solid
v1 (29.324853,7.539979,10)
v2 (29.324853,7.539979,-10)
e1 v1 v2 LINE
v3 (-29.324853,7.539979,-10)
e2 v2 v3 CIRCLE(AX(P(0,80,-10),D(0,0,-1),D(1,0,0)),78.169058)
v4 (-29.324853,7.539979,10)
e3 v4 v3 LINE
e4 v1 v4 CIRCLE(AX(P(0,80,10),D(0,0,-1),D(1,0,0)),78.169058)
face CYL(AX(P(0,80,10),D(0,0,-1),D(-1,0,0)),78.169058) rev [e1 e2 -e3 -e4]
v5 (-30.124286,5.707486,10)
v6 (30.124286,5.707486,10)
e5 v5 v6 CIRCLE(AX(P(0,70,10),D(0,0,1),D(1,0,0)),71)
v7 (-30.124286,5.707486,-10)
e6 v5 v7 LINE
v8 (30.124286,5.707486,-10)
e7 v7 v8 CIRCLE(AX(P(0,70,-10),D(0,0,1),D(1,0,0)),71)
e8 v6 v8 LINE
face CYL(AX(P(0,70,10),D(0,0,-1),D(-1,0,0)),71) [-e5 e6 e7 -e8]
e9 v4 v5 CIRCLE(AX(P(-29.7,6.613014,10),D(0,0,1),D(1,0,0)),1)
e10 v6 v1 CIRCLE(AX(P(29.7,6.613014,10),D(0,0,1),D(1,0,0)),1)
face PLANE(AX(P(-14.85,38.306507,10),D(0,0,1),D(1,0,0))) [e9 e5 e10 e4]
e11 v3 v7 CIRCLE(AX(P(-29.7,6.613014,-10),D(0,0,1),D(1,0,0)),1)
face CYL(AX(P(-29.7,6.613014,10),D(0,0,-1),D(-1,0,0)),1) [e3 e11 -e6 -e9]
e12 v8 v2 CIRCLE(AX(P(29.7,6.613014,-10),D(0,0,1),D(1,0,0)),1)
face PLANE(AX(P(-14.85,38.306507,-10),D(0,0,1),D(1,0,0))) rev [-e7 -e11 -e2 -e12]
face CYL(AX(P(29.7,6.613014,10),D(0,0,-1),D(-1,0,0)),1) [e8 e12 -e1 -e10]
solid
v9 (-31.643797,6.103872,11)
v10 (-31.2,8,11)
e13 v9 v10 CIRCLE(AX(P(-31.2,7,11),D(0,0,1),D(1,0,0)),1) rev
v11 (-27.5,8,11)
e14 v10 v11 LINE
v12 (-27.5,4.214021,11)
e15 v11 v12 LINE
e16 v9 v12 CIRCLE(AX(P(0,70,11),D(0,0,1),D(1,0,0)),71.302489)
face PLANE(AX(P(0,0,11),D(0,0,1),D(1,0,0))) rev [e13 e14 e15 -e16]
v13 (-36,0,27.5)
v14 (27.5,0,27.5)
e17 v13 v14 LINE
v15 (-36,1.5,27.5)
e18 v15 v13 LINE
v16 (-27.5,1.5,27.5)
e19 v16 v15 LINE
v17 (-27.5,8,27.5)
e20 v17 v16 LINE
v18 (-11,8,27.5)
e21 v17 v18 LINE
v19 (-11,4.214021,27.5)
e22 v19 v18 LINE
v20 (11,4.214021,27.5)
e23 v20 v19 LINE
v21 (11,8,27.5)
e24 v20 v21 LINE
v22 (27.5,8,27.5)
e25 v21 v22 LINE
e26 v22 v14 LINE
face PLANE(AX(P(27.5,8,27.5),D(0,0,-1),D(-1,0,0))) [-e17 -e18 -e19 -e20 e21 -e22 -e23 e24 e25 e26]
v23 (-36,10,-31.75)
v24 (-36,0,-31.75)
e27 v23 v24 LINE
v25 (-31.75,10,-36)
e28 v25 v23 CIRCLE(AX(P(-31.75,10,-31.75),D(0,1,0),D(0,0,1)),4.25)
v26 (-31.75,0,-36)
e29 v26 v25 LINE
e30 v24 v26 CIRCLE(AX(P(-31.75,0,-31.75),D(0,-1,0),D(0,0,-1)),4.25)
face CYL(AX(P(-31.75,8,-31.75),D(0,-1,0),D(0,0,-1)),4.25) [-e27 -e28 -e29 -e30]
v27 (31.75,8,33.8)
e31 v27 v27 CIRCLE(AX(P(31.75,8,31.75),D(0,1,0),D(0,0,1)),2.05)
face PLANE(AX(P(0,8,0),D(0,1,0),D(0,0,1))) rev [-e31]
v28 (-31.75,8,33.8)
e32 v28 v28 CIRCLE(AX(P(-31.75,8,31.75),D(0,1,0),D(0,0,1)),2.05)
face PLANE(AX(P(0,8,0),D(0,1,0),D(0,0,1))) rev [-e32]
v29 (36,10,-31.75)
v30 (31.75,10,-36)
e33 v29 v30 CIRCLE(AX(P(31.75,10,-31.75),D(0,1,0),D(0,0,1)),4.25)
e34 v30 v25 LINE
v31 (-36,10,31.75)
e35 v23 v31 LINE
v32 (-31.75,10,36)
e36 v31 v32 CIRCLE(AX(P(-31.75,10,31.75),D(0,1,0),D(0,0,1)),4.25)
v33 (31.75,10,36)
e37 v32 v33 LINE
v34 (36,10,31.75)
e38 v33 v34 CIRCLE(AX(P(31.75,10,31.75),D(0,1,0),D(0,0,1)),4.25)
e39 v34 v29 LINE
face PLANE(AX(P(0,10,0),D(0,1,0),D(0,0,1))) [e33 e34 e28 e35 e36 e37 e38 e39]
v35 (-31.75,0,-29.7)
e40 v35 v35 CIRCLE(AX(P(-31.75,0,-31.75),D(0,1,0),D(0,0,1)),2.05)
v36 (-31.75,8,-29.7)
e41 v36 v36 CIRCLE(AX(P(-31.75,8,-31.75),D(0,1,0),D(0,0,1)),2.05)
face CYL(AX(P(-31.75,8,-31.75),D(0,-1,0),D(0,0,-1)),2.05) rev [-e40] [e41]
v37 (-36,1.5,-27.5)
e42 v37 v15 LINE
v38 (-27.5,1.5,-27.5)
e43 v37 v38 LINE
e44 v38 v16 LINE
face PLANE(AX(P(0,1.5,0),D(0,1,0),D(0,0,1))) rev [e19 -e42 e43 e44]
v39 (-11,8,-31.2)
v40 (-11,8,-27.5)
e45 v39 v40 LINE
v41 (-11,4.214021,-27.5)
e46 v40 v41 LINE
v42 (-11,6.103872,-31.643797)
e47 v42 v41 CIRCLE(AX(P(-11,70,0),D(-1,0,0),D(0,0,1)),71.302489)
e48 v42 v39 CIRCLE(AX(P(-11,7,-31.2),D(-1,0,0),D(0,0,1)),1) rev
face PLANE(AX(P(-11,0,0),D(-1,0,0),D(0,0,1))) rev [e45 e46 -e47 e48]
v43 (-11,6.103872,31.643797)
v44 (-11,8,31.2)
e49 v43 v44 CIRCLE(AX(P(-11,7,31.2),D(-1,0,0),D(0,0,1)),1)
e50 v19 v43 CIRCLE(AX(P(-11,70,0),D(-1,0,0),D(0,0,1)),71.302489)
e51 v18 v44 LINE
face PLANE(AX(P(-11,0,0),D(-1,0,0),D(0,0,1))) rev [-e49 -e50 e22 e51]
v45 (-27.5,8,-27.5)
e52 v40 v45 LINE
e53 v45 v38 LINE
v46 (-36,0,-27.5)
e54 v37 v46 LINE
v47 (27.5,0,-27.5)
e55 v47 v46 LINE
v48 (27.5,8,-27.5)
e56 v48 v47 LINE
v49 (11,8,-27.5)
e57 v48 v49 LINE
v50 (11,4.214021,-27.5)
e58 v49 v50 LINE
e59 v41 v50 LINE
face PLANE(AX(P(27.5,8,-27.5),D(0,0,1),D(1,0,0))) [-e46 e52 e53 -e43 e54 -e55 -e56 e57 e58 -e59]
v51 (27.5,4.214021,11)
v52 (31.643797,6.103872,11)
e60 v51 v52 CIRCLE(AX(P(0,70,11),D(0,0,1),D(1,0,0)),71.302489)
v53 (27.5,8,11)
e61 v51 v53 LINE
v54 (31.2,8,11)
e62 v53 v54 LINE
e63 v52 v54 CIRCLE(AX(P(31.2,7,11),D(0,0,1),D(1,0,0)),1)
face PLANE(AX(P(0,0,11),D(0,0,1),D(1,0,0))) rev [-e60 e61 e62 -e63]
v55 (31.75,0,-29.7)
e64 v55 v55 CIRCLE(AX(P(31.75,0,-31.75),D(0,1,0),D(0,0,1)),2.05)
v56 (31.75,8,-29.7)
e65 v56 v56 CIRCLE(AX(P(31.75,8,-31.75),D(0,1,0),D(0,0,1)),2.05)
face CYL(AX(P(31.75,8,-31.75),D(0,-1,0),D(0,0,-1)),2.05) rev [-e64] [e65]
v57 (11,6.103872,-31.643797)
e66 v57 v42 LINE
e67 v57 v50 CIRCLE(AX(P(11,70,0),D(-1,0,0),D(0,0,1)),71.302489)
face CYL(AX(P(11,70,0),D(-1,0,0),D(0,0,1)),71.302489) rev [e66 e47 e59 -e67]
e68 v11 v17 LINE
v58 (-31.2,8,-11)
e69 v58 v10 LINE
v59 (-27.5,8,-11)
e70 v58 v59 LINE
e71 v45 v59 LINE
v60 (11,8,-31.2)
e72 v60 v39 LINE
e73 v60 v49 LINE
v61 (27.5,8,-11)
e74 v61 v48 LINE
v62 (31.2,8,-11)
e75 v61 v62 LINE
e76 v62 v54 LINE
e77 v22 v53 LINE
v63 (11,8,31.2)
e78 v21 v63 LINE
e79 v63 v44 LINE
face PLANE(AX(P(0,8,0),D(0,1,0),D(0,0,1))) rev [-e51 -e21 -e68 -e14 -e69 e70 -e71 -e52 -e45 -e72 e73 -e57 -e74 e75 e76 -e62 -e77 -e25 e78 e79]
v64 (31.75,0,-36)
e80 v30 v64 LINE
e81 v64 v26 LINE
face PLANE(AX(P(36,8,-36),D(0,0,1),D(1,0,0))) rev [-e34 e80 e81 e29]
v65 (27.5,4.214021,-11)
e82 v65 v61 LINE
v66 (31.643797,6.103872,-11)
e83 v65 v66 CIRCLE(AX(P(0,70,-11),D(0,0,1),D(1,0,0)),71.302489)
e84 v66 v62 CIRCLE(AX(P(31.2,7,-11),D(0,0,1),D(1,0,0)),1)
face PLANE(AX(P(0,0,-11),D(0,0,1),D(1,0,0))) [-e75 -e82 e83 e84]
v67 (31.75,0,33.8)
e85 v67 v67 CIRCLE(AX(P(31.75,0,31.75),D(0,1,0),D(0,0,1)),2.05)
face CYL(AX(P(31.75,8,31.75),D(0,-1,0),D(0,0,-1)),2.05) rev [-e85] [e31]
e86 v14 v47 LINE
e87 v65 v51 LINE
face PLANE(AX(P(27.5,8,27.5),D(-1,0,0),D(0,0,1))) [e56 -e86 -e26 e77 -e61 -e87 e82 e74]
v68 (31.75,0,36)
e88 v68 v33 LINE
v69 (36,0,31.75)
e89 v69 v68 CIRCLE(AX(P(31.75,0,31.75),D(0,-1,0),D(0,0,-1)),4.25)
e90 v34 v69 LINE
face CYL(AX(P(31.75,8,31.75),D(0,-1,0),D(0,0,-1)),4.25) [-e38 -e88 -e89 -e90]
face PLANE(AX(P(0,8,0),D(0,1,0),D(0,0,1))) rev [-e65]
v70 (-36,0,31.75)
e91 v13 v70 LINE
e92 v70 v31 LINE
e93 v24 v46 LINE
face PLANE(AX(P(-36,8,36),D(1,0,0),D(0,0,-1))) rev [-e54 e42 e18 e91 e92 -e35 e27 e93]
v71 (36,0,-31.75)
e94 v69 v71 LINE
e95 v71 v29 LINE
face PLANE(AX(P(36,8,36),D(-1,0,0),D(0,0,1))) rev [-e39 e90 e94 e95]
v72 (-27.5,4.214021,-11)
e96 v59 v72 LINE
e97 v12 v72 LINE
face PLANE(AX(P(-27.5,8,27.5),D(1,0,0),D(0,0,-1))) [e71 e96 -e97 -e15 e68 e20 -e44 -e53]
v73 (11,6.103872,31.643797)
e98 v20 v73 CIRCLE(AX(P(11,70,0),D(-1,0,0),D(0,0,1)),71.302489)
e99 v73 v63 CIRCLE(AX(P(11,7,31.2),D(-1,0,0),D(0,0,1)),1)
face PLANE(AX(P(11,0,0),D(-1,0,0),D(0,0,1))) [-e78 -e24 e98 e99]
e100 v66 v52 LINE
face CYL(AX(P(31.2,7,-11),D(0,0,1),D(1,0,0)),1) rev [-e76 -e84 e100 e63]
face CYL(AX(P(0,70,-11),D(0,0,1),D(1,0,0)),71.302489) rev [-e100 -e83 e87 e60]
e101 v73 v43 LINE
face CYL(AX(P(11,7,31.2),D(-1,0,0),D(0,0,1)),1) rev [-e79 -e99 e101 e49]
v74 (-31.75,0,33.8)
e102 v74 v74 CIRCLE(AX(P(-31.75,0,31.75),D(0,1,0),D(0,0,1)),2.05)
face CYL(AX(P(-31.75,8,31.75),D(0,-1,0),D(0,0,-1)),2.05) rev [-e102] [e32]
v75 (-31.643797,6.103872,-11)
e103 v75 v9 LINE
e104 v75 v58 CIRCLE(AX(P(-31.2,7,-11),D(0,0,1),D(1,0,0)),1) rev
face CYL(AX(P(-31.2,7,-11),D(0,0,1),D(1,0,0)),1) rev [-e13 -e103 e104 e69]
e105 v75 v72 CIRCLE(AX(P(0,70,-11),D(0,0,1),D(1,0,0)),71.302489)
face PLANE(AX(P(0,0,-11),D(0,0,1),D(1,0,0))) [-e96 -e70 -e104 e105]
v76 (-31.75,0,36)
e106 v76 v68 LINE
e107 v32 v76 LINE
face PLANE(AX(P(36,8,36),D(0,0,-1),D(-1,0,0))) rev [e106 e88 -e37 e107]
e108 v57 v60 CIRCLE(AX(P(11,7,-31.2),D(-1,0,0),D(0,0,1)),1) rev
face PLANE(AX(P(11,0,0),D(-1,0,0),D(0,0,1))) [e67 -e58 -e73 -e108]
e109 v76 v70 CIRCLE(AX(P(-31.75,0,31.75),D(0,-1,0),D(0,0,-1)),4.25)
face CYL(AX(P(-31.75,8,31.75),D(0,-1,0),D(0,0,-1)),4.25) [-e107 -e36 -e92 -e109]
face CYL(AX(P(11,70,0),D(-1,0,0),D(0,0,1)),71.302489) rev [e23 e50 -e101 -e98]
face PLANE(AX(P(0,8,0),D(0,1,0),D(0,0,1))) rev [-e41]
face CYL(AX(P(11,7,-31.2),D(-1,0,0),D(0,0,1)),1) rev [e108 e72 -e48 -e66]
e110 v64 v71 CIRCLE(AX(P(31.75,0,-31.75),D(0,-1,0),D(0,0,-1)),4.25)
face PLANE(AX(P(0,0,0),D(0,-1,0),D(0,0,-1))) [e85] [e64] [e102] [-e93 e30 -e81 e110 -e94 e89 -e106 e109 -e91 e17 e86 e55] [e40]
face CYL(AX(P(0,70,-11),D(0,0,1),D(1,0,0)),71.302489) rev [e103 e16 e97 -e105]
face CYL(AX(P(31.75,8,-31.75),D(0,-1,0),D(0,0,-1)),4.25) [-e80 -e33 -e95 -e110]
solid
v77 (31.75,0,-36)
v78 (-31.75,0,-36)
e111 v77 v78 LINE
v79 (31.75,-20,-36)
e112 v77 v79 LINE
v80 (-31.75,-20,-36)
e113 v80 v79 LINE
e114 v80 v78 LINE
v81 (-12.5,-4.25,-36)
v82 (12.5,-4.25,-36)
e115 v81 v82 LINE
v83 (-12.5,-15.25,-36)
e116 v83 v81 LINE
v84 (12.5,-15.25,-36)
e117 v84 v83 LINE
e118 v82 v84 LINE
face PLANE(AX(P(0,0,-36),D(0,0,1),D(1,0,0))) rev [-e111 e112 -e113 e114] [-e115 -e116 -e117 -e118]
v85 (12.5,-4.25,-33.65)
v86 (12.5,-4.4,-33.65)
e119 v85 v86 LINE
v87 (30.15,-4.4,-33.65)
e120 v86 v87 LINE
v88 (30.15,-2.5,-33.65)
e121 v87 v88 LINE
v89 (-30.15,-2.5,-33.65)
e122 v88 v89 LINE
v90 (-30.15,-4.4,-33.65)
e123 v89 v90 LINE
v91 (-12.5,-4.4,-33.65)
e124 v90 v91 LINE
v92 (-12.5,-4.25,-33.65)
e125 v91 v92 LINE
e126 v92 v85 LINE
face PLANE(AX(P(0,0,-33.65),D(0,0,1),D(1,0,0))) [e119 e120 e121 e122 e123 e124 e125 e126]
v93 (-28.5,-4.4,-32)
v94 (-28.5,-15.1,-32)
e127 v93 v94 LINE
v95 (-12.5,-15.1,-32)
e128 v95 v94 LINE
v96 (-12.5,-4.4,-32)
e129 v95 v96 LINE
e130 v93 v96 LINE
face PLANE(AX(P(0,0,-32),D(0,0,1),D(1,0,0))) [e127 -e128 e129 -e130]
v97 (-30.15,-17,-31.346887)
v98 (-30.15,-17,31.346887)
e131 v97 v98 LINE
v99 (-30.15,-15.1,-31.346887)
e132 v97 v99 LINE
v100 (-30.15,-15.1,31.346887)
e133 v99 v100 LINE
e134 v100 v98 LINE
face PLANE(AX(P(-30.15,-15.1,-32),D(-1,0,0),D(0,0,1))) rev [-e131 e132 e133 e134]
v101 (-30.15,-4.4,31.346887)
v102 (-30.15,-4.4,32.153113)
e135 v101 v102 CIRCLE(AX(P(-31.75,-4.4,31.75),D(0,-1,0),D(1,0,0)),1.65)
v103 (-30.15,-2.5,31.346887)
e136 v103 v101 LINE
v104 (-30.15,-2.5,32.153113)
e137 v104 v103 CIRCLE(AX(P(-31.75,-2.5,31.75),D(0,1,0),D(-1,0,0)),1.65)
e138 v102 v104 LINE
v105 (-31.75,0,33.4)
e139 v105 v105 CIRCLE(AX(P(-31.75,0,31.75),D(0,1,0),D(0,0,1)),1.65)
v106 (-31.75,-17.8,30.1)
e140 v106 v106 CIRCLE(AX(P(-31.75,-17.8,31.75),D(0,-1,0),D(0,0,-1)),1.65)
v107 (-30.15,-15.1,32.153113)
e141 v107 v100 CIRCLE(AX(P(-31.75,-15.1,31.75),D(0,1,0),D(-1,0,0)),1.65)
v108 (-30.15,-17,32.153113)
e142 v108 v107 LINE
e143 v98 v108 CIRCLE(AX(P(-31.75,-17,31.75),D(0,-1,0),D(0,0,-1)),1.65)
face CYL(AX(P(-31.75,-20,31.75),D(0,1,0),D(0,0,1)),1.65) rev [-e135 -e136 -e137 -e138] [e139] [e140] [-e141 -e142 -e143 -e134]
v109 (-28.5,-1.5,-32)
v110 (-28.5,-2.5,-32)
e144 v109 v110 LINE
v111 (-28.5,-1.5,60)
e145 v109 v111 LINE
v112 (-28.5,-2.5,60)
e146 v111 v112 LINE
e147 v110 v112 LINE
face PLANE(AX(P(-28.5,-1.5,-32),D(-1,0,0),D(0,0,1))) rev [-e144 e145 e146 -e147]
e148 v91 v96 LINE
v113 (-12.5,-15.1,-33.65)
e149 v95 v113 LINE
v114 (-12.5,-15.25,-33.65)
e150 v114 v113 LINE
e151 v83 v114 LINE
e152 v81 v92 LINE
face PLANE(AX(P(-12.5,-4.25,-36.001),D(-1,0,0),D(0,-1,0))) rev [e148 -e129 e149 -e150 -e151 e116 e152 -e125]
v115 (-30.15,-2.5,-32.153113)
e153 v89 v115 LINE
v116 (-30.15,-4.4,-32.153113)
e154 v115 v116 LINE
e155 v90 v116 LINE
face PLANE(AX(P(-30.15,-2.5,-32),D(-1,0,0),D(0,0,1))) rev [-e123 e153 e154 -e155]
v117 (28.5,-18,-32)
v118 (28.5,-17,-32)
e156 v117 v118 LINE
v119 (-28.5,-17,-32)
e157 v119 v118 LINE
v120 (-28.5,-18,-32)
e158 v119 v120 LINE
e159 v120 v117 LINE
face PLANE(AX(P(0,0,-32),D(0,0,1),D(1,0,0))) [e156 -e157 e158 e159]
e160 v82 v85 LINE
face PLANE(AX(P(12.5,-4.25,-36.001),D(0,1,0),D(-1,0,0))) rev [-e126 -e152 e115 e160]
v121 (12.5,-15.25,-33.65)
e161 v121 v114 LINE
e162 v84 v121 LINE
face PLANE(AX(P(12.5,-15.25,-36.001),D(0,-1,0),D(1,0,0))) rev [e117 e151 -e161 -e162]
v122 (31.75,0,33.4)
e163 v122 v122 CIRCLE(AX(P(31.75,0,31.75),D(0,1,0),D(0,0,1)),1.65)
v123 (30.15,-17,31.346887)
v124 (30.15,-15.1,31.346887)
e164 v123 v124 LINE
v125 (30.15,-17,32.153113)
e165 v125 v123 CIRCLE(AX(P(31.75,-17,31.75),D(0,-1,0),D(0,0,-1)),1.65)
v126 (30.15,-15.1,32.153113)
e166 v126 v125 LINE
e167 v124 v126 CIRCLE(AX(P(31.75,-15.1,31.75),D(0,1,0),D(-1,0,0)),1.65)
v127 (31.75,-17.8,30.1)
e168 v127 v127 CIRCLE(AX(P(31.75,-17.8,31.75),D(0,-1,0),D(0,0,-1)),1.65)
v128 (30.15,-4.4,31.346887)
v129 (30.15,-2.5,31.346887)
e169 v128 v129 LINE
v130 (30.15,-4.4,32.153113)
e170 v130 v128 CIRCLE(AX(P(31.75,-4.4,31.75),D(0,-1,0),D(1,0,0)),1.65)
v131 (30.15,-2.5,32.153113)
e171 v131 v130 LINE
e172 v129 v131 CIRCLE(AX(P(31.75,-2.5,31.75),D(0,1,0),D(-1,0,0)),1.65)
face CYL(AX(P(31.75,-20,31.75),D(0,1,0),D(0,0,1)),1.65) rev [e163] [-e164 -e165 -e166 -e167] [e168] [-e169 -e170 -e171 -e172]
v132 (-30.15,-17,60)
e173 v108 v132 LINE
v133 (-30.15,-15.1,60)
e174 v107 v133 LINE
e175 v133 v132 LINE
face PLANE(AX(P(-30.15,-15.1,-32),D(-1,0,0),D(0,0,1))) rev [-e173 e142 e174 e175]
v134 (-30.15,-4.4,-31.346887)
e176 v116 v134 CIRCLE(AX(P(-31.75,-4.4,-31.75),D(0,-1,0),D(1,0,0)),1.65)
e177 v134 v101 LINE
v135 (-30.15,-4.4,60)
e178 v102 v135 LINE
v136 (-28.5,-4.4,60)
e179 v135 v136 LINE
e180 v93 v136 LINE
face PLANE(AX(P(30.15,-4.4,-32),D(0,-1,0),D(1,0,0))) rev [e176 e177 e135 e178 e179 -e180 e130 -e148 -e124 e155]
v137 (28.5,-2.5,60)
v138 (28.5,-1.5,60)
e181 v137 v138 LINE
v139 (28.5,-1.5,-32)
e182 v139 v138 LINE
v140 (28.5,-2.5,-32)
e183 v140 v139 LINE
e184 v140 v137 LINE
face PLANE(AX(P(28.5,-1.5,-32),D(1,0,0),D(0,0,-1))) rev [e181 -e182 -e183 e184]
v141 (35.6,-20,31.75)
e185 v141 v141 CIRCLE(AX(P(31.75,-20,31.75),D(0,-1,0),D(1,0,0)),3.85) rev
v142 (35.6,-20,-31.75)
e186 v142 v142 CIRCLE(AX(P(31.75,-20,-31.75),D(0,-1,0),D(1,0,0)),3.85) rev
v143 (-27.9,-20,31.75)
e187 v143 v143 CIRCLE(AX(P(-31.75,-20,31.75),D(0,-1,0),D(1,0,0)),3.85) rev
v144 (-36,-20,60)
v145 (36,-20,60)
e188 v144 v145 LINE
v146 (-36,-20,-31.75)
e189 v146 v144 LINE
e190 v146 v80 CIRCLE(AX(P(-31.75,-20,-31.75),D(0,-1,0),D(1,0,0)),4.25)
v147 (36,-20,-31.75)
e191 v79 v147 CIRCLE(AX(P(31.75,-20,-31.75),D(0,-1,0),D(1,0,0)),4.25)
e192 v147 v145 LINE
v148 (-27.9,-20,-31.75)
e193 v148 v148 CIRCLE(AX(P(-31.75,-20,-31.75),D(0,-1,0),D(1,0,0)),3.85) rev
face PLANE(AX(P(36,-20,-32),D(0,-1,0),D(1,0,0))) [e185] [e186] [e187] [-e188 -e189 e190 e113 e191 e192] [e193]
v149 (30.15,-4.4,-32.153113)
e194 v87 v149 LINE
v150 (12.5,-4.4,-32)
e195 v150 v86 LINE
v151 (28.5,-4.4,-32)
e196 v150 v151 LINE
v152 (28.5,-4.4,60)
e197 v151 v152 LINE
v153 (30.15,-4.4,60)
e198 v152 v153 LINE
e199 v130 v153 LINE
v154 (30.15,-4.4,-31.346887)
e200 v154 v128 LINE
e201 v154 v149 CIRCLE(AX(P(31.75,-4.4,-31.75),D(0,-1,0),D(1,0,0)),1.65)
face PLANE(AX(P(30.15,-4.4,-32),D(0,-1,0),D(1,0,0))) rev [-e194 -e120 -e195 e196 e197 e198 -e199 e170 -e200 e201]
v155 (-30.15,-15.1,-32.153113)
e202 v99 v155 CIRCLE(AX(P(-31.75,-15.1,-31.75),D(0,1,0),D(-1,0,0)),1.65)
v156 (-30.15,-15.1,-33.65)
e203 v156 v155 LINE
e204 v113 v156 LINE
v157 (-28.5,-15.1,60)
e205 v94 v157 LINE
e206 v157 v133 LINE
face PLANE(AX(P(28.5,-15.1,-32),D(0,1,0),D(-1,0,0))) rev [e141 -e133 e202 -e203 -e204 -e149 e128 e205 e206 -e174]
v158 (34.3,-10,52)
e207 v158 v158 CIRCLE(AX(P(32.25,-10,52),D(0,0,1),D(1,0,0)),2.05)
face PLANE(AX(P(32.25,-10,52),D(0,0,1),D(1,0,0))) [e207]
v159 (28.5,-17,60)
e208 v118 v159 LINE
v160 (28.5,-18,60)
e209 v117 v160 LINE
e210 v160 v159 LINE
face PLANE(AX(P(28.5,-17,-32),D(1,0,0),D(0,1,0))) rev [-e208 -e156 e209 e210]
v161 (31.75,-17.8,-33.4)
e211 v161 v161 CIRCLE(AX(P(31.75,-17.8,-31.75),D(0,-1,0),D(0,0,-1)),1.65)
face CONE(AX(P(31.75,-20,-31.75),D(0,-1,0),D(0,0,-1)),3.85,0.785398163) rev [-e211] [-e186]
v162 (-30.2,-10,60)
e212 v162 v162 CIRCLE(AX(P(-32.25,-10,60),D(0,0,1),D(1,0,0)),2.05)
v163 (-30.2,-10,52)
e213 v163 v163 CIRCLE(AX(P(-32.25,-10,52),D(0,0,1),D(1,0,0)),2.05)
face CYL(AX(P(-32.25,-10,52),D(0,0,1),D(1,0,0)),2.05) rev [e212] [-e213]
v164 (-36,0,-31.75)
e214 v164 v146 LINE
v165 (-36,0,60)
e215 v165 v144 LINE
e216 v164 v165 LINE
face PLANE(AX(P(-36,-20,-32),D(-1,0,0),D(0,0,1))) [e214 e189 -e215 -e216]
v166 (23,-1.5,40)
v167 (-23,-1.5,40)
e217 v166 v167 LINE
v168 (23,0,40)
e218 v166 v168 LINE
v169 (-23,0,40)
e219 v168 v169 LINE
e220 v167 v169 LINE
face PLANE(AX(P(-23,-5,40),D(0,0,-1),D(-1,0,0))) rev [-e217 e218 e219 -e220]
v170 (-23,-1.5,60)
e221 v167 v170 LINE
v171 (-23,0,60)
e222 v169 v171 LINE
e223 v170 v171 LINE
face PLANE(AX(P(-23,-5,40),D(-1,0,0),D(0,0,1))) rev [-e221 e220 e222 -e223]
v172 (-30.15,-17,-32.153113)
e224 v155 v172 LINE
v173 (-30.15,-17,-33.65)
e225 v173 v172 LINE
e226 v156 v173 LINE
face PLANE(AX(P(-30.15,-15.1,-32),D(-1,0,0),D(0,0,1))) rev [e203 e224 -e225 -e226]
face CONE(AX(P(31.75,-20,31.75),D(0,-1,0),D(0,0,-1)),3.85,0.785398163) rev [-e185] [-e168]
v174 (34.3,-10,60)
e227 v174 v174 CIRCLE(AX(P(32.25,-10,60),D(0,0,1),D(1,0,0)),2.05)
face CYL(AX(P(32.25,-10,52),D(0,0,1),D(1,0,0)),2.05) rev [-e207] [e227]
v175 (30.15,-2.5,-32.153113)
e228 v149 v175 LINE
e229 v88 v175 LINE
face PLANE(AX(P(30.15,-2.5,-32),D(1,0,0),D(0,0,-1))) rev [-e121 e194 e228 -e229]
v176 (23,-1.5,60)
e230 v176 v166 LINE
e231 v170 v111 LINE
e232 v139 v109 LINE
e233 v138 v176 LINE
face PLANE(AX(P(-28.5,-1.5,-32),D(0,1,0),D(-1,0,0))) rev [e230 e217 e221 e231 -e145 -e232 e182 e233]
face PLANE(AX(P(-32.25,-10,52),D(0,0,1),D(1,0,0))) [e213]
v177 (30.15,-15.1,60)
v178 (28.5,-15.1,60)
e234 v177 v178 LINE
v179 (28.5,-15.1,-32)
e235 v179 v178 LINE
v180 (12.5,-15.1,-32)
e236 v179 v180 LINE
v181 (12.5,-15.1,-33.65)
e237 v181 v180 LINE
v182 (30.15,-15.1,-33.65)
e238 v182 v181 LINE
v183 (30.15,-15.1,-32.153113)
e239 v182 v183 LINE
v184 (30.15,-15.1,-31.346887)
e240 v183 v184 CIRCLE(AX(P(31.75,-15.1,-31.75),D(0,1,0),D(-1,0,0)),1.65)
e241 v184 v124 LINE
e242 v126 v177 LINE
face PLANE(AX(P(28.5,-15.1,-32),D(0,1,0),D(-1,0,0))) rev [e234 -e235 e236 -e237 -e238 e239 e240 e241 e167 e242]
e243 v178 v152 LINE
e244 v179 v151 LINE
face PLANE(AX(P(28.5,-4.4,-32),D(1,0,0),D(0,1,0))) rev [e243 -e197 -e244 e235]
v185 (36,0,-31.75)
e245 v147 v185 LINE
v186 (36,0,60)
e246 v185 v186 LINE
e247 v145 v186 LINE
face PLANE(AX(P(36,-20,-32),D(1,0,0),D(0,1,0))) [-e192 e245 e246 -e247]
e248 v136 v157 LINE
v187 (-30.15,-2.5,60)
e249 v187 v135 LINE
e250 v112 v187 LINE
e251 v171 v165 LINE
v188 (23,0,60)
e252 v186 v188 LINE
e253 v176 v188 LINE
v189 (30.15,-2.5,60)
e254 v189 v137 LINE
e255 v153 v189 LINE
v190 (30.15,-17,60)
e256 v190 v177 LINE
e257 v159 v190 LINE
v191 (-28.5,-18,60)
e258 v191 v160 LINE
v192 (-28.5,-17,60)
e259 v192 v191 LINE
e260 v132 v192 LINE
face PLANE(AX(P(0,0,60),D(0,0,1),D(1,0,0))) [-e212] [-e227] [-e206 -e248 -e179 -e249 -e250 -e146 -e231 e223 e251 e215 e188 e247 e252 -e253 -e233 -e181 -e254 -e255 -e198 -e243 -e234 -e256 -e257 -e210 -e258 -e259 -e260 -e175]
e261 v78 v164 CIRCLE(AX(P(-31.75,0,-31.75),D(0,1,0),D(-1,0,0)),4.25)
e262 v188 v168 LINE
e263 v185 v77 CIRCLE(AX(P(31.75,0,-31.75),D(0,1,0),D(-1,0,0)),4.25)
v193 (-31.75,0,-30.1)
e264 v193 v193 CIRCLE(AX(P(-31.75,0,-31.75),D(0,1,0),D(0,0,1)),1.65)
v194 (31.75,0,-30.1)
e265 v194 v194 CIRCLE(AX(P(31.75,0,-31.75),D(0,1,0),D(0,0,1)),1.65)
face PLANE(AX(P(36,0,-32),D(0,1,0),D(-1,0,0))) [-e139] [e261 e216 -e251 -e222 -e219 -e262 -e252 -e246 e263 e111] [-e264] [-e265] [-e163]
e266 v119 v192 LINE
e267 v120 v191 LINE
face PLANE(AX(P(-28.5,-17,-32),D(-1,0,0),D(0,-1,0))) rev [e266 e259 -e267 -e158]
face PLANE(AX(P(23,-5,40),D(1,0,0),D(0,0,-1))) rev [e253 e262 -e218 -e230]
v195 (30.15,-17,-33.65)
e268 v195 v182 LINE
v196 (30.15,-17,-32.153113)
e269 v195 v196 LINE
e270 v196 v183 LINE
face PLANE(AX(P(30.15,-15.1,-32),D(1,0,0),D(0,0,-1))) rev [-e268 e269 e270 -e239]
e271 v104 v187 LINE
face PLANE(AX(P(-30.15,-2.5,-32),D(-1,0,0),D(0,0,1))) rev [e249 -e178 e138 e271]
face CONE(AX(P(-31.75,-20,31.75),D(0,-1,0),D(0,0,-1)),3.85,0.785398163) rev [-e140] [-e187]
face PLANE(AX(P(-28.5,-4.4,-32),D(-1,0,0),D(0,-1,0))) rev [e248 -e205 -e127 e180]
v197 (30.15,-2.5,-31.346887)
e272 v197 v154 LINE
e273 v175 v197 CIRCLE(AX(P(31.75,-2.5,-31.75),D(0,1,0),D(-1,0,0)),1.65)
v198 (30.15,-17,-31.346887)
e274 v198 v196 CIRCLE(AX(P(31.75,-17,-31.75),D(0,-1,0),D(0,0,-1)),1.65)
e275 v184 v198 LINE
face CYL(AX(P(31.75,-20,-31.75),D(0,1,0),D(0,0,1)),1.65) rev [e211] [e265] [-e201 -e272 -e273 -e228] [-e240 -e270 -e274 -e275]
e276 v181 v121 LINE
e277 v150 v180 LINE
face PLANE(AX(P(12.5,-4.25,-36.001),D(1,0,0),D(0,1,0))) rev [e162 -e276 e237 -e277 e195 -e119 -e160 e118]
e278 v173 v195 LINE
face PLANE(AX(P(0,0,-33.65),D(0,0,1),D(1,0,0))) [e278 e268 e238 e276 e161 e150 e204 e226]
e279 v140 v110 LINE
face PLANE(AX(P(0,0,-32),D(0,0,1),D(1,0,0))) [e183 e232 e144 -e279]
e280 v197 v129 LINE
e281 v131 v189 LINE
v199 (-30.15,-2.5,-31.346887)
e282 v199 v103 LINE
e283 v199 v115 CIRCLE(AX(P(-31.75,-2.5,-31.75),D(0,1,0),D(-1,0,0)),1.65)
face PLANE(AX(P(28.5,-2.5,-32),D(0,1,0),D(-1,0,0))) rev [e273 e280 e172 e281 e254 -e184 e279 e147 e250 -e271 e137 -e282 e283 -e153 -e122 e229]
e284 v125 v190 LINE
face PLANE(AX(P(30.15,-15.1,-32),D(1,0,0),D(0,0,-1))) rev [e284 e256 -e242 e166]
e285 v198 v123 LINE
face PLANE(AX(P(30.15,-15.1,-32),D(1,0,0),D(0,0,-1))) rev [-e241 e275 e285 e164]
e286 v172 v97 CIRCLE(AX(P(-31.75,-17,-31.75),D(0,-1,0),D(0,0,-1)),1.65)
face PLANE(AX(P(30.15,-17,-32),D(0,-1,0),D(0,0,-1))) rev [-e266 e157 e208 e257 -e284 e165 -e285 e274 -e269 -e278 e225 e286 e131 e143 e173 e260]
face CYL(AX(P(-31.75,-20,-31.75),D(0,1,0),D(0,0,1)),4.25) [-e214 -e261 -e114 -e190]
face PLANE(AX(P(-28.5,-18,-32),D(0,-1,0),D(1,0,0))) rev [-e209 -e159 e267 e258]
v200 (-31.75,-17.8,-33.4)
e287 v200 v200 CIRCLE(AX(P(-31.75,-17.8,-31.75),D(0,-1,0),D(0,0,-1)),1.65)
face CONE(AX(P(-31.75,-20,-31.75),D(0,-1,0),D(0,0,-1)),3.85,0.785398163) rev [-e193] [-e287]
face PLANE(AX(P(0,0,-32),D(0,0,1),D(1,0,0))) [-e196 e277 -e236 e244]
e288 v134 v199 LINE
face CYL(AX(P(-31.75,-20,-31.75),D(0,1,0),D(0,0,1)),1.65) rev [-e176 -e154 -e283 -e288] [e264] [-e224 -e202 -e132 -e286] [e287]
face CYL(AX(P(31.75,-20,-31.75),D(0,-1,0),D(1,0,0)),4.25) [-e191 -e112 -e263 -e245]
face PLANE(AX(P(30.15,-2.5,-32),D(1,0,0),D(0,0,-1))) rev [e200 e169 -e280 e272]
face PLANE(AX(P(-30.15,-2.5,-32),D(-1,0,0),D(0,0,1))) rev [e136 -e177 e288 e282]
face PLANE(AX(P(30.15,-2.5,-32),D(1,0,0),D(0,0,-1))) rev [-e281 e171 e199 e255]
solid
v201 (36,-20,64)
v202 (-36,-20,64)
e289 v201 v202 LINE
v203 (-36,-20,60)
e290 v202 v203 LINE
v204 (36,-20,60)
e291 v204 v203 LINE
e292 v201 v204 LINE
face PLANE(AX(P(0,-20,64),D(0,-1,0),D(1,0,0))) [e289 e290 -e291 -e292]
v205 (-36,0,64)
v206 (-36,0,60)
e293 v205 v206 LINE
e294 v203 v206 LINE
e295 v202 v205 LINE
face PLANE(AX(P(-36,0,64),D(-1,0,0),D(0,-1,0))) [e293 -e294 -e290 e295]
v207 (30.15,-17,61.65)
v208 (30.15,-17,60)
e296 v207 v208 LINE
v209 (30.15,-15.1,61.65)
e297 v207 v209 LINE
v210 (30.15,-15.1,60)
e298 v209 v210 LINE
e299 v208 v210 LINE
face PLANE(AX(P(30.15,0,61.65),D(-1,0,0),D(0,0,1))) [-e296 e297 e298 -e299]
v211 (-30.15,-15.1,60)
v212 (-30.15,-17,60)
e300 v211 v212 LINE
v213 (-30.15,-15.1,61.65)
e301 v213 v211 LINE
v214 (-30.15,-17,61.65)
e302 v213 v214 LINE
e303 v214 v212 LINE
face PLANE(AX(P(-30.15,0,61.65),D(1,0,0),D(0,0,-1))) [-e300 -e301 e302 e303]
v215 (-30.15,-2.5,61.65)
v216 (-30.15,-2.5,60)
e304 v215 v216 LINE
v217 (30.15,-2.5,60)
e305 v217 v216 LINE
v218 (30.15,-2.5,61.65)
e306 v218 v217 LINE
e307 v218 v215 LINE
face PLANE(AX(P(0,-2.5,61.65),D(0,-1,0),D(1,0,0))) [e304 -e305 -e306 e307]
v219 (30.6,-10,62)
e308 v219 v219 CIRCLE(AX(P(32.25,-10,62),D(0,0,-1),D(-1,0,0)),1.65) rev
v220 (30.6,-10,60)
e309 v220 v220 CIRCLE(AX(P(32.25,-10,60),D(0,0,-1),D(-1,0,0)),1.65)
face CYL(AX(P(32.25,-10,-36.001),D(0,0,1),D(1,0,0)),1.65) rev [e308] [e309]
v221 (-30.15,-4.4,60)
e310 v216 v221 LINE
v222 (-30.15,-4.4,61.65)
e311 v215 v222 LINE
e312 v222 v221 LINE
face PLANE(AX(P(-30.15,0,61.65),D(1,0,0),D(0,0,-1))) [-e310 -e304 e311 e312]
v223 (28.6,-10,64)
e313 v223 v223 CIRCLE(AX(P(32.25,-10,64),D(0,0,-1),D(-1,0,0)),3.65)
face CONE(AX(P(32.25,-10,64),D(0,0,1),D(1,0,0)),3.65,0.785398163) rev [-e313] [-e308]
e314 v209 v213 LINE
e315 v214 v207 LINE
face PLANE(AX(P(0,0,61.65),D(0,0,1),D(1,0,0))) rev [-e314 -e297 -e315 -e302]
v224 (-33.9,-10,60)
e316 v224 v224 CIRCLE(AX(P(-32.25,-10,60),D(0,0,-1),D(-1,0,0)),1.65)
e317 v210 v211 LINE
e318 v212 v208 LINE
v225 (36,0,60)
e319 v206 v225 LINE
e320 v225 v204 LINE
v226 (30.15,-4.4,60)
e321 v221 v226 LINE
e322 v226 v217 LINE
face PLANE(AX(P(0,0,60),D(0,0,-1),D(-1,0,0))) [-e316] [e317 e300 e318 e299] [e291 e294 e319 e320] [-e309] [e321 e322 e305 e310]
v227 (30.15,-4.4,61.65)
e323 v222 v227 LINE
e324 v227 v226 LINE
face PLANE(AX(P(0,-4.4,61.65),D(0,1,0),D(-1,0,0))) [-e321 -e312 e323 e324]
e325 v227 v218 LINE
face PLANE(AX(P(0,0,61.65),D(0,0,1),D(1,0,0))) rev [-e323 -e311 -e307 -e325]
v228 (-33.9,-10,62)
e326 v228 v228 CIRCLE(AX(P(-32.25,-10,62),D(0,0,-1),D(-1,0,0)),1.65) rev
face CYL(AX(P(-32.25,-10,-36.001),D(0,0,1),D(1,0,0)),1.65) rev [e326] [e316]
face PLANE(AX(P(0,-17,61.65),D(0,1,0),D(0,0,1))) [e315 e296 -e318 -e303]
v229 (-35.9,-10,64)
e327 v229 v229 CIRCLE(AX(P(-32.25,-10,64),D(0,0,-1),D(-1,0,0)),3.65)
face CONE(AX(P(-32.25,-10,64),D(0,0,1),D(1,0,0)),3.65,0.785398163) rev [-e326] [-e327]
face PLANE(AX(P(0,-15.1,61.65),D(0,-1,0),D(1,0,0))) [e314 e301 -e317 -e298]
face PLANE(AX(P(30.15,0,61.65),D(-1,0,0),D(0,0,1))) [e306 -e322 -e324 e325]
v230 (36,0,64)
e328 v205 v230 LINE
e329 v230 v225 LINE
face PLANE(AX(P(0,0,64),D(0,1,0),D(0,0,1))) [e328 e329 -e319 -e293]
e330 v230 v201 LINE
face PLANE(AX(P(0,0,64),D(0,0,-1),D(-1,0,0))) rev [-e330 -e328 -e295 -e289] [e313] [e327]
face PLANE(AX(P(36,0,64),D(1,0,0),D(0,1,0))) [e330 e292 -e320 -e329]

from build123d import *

# Parameters (mm, degrees)
SKETCH2_W                                = 72
SKETCH2_H                                = 72
SKETCH2_R                                = 2.05
SKETCH2_W_2                              = 55
SKETCH2_H_2                              = 55
CARD_EXTENSION_WALLS_DEPTH               = 8
CARD_EXTENSION_TOP_START                 = 8
SKETCH3_W                                = 72
SKETCH3_H                                = 72
CARD_EXTENSION_TOP_DEPTH                 = 2
CARD_EXTENSION_SPRING_CUT_START          = -11
CARD_EXTENSION_SPRING_CUT_DEPTH          = 22
CARD_EXTENSION_SPRING_CUT_02_COUNT       = 2
CARD_EXTENSION_SPRING_CUT_02_ANGLE       = 90
CARD_EXTENSION_CARD_CUT_DEPTH            = 1.5
CARD_EXTENSION_CORNER_FILLETS_R          = 4.25
SPRING_DEPTH                             = 10
PCB_ENCLOSURE_WALLS_DEPTH                = 60
PCB_ENCLOSURE_WALLS_DEPTH_BACK           = 32
SKETCH9_W                                = 72
SKETCH9_H                                = 20
PCB_ENCLOSURE_TOP_START                  = 60
SKETCH14_W                               = 72
SKETCH14_H                               = 20
PCB_ENCLOSURE_TOP_DEPTH                  = 4
PCB_ENCLOSURE_BOT_START                  = -36
PCB_ENCLOSURE_BOT_OUTLINE_W              = 72
PCB_ENCLOSURE_BOT_OUTLINE_H              = 20
PCB_ENCLOSURE_BOT_DEPTH                  = 4
PCB_ENCLOSURE_BOT_PCB_RILLE_START        = -33.65
PCB_ENCLOSURE_BOT_PCB_RILLE_DEPTH        = 1.65
PCB_ENCLOSURE_TOP_PCB_RILLE_START        = -30.15
PCB_ENCLOSURE_TOP_PCB_RILLE_OUTLINE_W    = 1.9
PCB_ENCLOSURE_TOP_PCB_RILLE_OUTLINE_H    = 1.65
PCB_ENCLOSURE_TOP_PCB_RILLE_DEPTH        = 60.3
SKETCH17_W                               = 46
SKETCH17_H                               = 20
PCB_ENCLOSURE_DISPLAY_CUT_DEPTH          = 5
PCB_ENCLOSURE_JUMPER_CUT_START           = -36
SKETCH18_W                               = 25
SKETCH18_H                               = 11
PCB_ENCLOSURE_JUMPER_CUT_DEPTH           = 4
PCB_ENCLOSURE_ENSCHMELZMUTTERN_TOP_START = 60
SKETCH19_R                               = 2.05
PCB_ENCLOSURE_ENSCHMELZMUTTERN_TOP_DEPTH = 8
SKETCH11_R                               = 1.65
PCB_ENCLOSURE_BOHRUNGEN_DEPTH            = 77.105190362
PCB_ENCLOSURE_SCREW_CHAMFERS_SIZE        = 2.2
CUT_EXTRUDE1_START                       = 64
SKETCH21_R                               = 1.65
CUT_EXTRUDE1_DEPTH                       = 94.177581
CHAMFER1_SIZE                            = 2
FILLET2_R                                = 4.25


# Read off the part's stored shape, not the designer's step: Card_Extension_Spring_Cut, PCB_Enclosure_Bot, PCB_Enclosure_Top_PCB_Rille
with BuildPart() as part:
    # Sketch2 → Card_Extension_Walls (new body)
    with BuildSketch(Plane(origin=(0, 0, 0), x_dir=(1, 0, 0), z_dir=(0, 1, 0))):
        Rectangle(SKETCH2_W, SKETCH2_H)
        with Locations(Location((-31.75, -31.75, 0), (0, 0, 270))):
            Circle(SKETCH2_R, mode=Mode.SUBTRACT)
        with Locations(Location((31.75, -31.75, 0), (0, 0, 270))):
            Circle(SKETCH2_R, mode=Mode.SUBTRACT)
        with Locations(Location((31.75, 31.75, 0), (0, 0, 270))):
            Circle(SKETCH2_R, mode=Mode.SUBTRACT)
        with Locations(Location((-31.75, 31.75, 0), (0, 0, 270))):
            Circle(SKETCH2_R, mode=Mode.SUBTRACT)
        Rectangle(SKETCH2_W_2, SKETCH2_H_2, mode=Mode.SUBTRACT)
    extrude(amount=CARD_EXTENSION_WALLS_DEPTH)

    # Sketch3 → Card_Extension_Top (add)
    with BuildSketch(Plane(origin=(0, 0, 0), x_dir=(1, 0, 0), z_dir=(0, 1, 0)).offset(CARD_EXTENSION_TOP_START)):
        Rectangle(SKETCH3_W, SKETCH3_H)
    extrude(amount=CARD_EXTENSION_TOP_DEPTH)

    # Card_Extension_Spring_Cut outline → Card_Extension_Spring_Cut (cut)
    with BuildSketch(Plane.XY.offset(CARD_EXTENSION_SPRING_CUT_START)):
        with BuildLine():
            Line((-27.5, 8), (-31.2, 8))
            ThreePointArc((-31.2, 8), (-32.173685675, 7.227895167), (-31.643796519, 6.103872414))
            ThreePointArc((-31.643796519, 6.103872414), (-29.586991244, 5.125853164), (-27.5, 4.214021414))
            Line((-27.5, 4.214021414), (-27.5, 8))
        make_face()
        with BuildLine():
            Line((31.2, 8), (27.5, 8))
            Line((27.5, 8), (27.5, 4.214021414))
            ThreePointArc((27.5, 4.214021414), (29.586991244, 5.125853164), (31.643796519, 6.103872414))
            ThreePointArc((31.643796519, 6.103872414), (32.173685675, 7.227895167), (31.2, 8))
        make_face()
    card_extension_spring_cut = extrude(amount=CARD_EXTENSION_SPRING_CUT_DEPTH, mode=Mode.SUBTRACT)

    # Card_Extension_Spring_Cut_02: Card_Extension_Spring_Cut ×2 about axis
    card_extension_spring_cut_02_axis = Axis((0, 17.535227834, 0), (0, -1, 0))
    for i in range(1, CARD_EXTENSION_SPRING_CUT_02_COUNT):
        add(card_extension_spring_cut.rotate(card_extension_spring_cut_02_axis, i * CARD_EXTENSION_SPRING_CUT_02_ANGLE / (CARD_EXTENSION_SPRING_CUT_02_COUNT - 1)), mode=Mode.SUBTRACT)

    # Sketch6 → Card_Extension_Card_Cut (cut)
    with BuildSketch(Plane(origin=(0, 0, 0), x_dir=(-1, 0, 0), z_dir=(0, 1, 0))):
        Polygon((27.5, -27.5), (-27.5, -27.5), (-27.5, 27.5), (27.5, 27.5), (36, 27.5), (36, -27.5), align=None)
    extrude(amount=CARD_EXTENSION_CARD_CUT_DEPTH, mode=Mode.SUBTRACT)

    # Card_Extension_Corner_Fillets
    card_extension_corner_fillets_edges = [part.edges().sort_by_distance(p)[0] for p in [
        (-36, 5, 36),
        (-36, 5, -36),
        (36, 5, -36),
        (36, 5, 36),
    ]]
    fillet(card_extension_corner_fillets_edges, radius=CARD_EXTENSION_CORNER_FILLETS_R)


with BuildPart() as body_2:
    # Sketch7 → Spring (new, symmetric)
    with BuildSketch(Plane.XY):
        with BuildLine():
            ThreePointArc((-29.324853436, 7.539979463), (0, 1.83094215), (29.324853436, 7.539979463))
            ThreePointArc((29.324853436, 7.539979463), (30.616576304, 7.012873779), (30.124285714, 5.707485582))
            ThreePointArc((30.124285714, 5.707485582), (0, -1), (-30.124285714, 5.707485582))
            ThreePointArc((-30.124285714, 5.707485582), (-30.616576304, 7.012873779), (-29.324853436, 7.539979463))
        make_face()
    extrude(amount=SPRING_DEPTH, both=True)


with BuildPart() as body_3:
    # Sketch9 → PCB_Enclosure_Walls (new, two sides: drawn at the far end of the back side and taken through both)
    with BuildSketch(Plane.XY.offset(-PCB_ENCLOSURE_WALLS_DEPTH_BACK)):
        with Locations((0, -10)):
            Rectangle(SKETCH9_W, SKETCH9_H)
        Polygon((28.5, -1.5), (28.5, -2.5), (30.15, -2.5), (30.15, -4.4), (28.5, -4.4), (28.5, -15.1), (30.15, -15.1), (30.15, -17), (28.5, -17), (28.5, -18), (-28.5, -18), (-28.5, -17), (-30.15, -17), (-30.15, -15.1), (-28.5, -15.1), (-28.5, -4.4), (-30.15, -4.4), (-30.15, -2.5), (-28.5, -2.5), (-28.5, -1.5), align=None, mode=Mode.SUBTRACT)
    extrude(amount=PCB_ENCLOSURE_WALLS_DEPTH + PCB_ENCLOSURE_WALLS_DEPTH_BACK)

    # PCB_Enclosure_Bot outline → PCB_Enclosure_Bot (add)
    with BuildSketch(Plane.XY.offset(PCB_ENCLOSURE_BOT_START)):
        with Locations((0, -10)):
            Rectangle(PCB_ENCLOSURE_BOT_OUTLINE_W, PCB_ENCLOSURE_BOT_OUTLINE_H)
    extrude(amount=PCB_ENCLOSURE_BOT_DEPTH)

    # Sketch15 → PCB_Enclosure_Bot_PCB_Rille (cut)
    with BuildSketch(Plane.XY.offset(PCB_ENCLOSURE_BOT_PCB_RILLE_START)):
        Polygon((30.15, -17), (28.5, -17), (-28.5, -17), (-30.15, -17), (-30.15, -15.1), (-28.5, -15.1), (28.5, -15.1), (30.15, -15.1), align=None)
        Polygon((30.15, -4.4), (28.5, -4.4), (-28.5, -4.4), (-30.15, -4.4), (-30.15, -2.5), (-28.5, -2.5), (28.5, -2.5), (30.15, -2.5), align=None)
    extrude(amount=PCB_ENCLOSURE_BOT_PCB_RILLE_DEPTH, mode=Mode.SUBTRACT)

    # Sketch17 → PCB_Enclosure_Display_Cut (cut)
    with BuildSketch(Plane(origin=(0, 0, 0), x_dir=(1, 0, 0), z_dir=(0, 1, 0))):
        with Locations((0, -50)):
            Rectangle(SKETCH17_W, SKETCH17_H)
    extrude(amount=-PCB_ENCLOSURE_DISPLAY_CUT_DEPTH, mode=Mode.SUBTRACT)

    # Sketch18 → PCB_Enclosure_Jumper_Cut (cut)
    with BuildSketch(Plane.XY.offset(PCB_ENCLOSURE_JUMPER_CUT_START)):
        with Locations((0, -9.75)):
            Rectangle(SKETCH18_W, SKETCH18_H)
    extrude(amount=PCB_ENCLOSURE_JUMPER_CUT_DEPTH, mode=Mode.SUBTRACT)

    # Sketch19 → PCB_Enclosure_Enschmelzmuttern_Top (cut)
    with BuildSketch(Plane.XY.offset(PCB_ENCLOSURE_ENSCHMELZMUTTERN_TOP_START)):
        with Locations((32.25, -10)):
            Circle(SKETCH19_R)
        with Locations((-32.25, -10)):
            Circle(SKETCH19_R)
    extrude(amount=-PCB_ENCLOSURE_ENSCHMELZMUTTERN_TOP_DEPTH, mode=Mode.SUBTRACT)

    # Sketch11 → PCB_Enclosure_Bohrungen (cut, through all)
    with BuildSketch(Plane(origin=(0, 0, 0), x_dir=(1, 0, 0), z_dir=(0, 1, 0))):
        with Locations(Location((31.75, -31.75, 0), (0, 0, 270))):
            Circle(SKETCH11_R)
        with Locations(Location((-31.75, -31.75, 0), (0, 0, 270))):
            Circle(SKETCH11_R)
        with Locations(Location((31.75, 31.75, 0), (0, 0, 270))):
            Circle(SKETCH11_R)
        with Locations(Location((-31.75, 31.75, 0), (0, 0, 270))):
            Circle(SKETCH11_R)
    extrude(amount=-PCB_ENCLOSURE_BOHRUNGEN_DEPTH, mode=Mode.SUBTRACT)

    # PCB_Enclosure_Screw_Chamfers
    pcb_enclosure_screw_chamfers_edges = [body_3.edges().sort_by_distance(p)[0] for p in [
        (-31.75, -20, 30.1),
        (31.75, -20, -33.4),
        (-31.75, -20, -33.4),
        (31.75, -20, 30.1),
    ]]
    chamfer(pcb_enclosure_screw_chamfers_edges, length=PCB_ENCLOSURE_SCREW_CHAMFERS_SIZE)

    # Fillet2
    fillet2_edges = [body_3.edges().sort_by_distance(p)[0] for p in [
        (-36, -10, -36),
        (36, -10, -36),
    ]]
    fillet(fillet2_edges, radius=FILLET2_R)


with BuildPart() as body_4:
    # Sketch14 → PCB_Enclosure_Top (new body)
    with BuildSketch(Plane.XY.offset(PCB_ENCLOSURE_TOP_START)):
        with Locations((0, -10)):
            Rectangle(SKETCH14_W, SKETCH14_H)
    extrude(amount=PCB_ENCLOSURE_TOP_DEPTH)

    # PCB_Enclosure_Top_PCB_Rille outline → PCB_Enclosure_Top_PCB_Rille (cut)
    with BuildSketch(Plane.YZ.offset(PCB_ENCLOSURE_TOP_PCB_RILLE_START)):
        with Locations((-16.05, 60.825)):
            Rectangle(PCB_ENCLOSURE_TOP_PCB_RILLE_OUTLINE_W, PCB_ENCLOSURE_TOP_PCB_RILLE_OUTLINE_H)
        with Locations((-3.45, 60.825)):
            Rectangle(PCB_ENCLOSURE_TOP_PCB_RILLE_OUTLINE_W, PCB_ENCLOSURE_TOP_PCB_RILLE_OUTLINE_H)
    extrude(amount=PCB_ENCLOSURE_TOP_PCB_RILLE_DEPTH, mode=Mode.SUBTRACT)

    # Sketch21 → Cut-Extrude1 (cut)
    with BuildSketch(Plane.XY.offset(CUT_EXTRUDE1_START)):
        with Locations(Location((32.25, -10, 0), (0, 0, 180))):
            Circle(SKETCH21_R)
        with Locations(Location((-32.25, -10, 0), (0, 0, 180))):
            Circle(SKETCH21_R)
    extrude(amount=-CUT_EXTRUDE1_DEPTH, mode=Mode.SUBTRACT)

    # Chamfer1
    chamfer1_edges = [body_4.edges().sort_by_distance(p)[0] for p in [
        (33.9, -10, 64),
        (-30.6, -10, 64),
    ]]
    chamfer(chamfer1_edges, length=CHAMFER1_SIZE)


solid = Compound([part.part, body_2.part, body_3.part, body_4.part])
